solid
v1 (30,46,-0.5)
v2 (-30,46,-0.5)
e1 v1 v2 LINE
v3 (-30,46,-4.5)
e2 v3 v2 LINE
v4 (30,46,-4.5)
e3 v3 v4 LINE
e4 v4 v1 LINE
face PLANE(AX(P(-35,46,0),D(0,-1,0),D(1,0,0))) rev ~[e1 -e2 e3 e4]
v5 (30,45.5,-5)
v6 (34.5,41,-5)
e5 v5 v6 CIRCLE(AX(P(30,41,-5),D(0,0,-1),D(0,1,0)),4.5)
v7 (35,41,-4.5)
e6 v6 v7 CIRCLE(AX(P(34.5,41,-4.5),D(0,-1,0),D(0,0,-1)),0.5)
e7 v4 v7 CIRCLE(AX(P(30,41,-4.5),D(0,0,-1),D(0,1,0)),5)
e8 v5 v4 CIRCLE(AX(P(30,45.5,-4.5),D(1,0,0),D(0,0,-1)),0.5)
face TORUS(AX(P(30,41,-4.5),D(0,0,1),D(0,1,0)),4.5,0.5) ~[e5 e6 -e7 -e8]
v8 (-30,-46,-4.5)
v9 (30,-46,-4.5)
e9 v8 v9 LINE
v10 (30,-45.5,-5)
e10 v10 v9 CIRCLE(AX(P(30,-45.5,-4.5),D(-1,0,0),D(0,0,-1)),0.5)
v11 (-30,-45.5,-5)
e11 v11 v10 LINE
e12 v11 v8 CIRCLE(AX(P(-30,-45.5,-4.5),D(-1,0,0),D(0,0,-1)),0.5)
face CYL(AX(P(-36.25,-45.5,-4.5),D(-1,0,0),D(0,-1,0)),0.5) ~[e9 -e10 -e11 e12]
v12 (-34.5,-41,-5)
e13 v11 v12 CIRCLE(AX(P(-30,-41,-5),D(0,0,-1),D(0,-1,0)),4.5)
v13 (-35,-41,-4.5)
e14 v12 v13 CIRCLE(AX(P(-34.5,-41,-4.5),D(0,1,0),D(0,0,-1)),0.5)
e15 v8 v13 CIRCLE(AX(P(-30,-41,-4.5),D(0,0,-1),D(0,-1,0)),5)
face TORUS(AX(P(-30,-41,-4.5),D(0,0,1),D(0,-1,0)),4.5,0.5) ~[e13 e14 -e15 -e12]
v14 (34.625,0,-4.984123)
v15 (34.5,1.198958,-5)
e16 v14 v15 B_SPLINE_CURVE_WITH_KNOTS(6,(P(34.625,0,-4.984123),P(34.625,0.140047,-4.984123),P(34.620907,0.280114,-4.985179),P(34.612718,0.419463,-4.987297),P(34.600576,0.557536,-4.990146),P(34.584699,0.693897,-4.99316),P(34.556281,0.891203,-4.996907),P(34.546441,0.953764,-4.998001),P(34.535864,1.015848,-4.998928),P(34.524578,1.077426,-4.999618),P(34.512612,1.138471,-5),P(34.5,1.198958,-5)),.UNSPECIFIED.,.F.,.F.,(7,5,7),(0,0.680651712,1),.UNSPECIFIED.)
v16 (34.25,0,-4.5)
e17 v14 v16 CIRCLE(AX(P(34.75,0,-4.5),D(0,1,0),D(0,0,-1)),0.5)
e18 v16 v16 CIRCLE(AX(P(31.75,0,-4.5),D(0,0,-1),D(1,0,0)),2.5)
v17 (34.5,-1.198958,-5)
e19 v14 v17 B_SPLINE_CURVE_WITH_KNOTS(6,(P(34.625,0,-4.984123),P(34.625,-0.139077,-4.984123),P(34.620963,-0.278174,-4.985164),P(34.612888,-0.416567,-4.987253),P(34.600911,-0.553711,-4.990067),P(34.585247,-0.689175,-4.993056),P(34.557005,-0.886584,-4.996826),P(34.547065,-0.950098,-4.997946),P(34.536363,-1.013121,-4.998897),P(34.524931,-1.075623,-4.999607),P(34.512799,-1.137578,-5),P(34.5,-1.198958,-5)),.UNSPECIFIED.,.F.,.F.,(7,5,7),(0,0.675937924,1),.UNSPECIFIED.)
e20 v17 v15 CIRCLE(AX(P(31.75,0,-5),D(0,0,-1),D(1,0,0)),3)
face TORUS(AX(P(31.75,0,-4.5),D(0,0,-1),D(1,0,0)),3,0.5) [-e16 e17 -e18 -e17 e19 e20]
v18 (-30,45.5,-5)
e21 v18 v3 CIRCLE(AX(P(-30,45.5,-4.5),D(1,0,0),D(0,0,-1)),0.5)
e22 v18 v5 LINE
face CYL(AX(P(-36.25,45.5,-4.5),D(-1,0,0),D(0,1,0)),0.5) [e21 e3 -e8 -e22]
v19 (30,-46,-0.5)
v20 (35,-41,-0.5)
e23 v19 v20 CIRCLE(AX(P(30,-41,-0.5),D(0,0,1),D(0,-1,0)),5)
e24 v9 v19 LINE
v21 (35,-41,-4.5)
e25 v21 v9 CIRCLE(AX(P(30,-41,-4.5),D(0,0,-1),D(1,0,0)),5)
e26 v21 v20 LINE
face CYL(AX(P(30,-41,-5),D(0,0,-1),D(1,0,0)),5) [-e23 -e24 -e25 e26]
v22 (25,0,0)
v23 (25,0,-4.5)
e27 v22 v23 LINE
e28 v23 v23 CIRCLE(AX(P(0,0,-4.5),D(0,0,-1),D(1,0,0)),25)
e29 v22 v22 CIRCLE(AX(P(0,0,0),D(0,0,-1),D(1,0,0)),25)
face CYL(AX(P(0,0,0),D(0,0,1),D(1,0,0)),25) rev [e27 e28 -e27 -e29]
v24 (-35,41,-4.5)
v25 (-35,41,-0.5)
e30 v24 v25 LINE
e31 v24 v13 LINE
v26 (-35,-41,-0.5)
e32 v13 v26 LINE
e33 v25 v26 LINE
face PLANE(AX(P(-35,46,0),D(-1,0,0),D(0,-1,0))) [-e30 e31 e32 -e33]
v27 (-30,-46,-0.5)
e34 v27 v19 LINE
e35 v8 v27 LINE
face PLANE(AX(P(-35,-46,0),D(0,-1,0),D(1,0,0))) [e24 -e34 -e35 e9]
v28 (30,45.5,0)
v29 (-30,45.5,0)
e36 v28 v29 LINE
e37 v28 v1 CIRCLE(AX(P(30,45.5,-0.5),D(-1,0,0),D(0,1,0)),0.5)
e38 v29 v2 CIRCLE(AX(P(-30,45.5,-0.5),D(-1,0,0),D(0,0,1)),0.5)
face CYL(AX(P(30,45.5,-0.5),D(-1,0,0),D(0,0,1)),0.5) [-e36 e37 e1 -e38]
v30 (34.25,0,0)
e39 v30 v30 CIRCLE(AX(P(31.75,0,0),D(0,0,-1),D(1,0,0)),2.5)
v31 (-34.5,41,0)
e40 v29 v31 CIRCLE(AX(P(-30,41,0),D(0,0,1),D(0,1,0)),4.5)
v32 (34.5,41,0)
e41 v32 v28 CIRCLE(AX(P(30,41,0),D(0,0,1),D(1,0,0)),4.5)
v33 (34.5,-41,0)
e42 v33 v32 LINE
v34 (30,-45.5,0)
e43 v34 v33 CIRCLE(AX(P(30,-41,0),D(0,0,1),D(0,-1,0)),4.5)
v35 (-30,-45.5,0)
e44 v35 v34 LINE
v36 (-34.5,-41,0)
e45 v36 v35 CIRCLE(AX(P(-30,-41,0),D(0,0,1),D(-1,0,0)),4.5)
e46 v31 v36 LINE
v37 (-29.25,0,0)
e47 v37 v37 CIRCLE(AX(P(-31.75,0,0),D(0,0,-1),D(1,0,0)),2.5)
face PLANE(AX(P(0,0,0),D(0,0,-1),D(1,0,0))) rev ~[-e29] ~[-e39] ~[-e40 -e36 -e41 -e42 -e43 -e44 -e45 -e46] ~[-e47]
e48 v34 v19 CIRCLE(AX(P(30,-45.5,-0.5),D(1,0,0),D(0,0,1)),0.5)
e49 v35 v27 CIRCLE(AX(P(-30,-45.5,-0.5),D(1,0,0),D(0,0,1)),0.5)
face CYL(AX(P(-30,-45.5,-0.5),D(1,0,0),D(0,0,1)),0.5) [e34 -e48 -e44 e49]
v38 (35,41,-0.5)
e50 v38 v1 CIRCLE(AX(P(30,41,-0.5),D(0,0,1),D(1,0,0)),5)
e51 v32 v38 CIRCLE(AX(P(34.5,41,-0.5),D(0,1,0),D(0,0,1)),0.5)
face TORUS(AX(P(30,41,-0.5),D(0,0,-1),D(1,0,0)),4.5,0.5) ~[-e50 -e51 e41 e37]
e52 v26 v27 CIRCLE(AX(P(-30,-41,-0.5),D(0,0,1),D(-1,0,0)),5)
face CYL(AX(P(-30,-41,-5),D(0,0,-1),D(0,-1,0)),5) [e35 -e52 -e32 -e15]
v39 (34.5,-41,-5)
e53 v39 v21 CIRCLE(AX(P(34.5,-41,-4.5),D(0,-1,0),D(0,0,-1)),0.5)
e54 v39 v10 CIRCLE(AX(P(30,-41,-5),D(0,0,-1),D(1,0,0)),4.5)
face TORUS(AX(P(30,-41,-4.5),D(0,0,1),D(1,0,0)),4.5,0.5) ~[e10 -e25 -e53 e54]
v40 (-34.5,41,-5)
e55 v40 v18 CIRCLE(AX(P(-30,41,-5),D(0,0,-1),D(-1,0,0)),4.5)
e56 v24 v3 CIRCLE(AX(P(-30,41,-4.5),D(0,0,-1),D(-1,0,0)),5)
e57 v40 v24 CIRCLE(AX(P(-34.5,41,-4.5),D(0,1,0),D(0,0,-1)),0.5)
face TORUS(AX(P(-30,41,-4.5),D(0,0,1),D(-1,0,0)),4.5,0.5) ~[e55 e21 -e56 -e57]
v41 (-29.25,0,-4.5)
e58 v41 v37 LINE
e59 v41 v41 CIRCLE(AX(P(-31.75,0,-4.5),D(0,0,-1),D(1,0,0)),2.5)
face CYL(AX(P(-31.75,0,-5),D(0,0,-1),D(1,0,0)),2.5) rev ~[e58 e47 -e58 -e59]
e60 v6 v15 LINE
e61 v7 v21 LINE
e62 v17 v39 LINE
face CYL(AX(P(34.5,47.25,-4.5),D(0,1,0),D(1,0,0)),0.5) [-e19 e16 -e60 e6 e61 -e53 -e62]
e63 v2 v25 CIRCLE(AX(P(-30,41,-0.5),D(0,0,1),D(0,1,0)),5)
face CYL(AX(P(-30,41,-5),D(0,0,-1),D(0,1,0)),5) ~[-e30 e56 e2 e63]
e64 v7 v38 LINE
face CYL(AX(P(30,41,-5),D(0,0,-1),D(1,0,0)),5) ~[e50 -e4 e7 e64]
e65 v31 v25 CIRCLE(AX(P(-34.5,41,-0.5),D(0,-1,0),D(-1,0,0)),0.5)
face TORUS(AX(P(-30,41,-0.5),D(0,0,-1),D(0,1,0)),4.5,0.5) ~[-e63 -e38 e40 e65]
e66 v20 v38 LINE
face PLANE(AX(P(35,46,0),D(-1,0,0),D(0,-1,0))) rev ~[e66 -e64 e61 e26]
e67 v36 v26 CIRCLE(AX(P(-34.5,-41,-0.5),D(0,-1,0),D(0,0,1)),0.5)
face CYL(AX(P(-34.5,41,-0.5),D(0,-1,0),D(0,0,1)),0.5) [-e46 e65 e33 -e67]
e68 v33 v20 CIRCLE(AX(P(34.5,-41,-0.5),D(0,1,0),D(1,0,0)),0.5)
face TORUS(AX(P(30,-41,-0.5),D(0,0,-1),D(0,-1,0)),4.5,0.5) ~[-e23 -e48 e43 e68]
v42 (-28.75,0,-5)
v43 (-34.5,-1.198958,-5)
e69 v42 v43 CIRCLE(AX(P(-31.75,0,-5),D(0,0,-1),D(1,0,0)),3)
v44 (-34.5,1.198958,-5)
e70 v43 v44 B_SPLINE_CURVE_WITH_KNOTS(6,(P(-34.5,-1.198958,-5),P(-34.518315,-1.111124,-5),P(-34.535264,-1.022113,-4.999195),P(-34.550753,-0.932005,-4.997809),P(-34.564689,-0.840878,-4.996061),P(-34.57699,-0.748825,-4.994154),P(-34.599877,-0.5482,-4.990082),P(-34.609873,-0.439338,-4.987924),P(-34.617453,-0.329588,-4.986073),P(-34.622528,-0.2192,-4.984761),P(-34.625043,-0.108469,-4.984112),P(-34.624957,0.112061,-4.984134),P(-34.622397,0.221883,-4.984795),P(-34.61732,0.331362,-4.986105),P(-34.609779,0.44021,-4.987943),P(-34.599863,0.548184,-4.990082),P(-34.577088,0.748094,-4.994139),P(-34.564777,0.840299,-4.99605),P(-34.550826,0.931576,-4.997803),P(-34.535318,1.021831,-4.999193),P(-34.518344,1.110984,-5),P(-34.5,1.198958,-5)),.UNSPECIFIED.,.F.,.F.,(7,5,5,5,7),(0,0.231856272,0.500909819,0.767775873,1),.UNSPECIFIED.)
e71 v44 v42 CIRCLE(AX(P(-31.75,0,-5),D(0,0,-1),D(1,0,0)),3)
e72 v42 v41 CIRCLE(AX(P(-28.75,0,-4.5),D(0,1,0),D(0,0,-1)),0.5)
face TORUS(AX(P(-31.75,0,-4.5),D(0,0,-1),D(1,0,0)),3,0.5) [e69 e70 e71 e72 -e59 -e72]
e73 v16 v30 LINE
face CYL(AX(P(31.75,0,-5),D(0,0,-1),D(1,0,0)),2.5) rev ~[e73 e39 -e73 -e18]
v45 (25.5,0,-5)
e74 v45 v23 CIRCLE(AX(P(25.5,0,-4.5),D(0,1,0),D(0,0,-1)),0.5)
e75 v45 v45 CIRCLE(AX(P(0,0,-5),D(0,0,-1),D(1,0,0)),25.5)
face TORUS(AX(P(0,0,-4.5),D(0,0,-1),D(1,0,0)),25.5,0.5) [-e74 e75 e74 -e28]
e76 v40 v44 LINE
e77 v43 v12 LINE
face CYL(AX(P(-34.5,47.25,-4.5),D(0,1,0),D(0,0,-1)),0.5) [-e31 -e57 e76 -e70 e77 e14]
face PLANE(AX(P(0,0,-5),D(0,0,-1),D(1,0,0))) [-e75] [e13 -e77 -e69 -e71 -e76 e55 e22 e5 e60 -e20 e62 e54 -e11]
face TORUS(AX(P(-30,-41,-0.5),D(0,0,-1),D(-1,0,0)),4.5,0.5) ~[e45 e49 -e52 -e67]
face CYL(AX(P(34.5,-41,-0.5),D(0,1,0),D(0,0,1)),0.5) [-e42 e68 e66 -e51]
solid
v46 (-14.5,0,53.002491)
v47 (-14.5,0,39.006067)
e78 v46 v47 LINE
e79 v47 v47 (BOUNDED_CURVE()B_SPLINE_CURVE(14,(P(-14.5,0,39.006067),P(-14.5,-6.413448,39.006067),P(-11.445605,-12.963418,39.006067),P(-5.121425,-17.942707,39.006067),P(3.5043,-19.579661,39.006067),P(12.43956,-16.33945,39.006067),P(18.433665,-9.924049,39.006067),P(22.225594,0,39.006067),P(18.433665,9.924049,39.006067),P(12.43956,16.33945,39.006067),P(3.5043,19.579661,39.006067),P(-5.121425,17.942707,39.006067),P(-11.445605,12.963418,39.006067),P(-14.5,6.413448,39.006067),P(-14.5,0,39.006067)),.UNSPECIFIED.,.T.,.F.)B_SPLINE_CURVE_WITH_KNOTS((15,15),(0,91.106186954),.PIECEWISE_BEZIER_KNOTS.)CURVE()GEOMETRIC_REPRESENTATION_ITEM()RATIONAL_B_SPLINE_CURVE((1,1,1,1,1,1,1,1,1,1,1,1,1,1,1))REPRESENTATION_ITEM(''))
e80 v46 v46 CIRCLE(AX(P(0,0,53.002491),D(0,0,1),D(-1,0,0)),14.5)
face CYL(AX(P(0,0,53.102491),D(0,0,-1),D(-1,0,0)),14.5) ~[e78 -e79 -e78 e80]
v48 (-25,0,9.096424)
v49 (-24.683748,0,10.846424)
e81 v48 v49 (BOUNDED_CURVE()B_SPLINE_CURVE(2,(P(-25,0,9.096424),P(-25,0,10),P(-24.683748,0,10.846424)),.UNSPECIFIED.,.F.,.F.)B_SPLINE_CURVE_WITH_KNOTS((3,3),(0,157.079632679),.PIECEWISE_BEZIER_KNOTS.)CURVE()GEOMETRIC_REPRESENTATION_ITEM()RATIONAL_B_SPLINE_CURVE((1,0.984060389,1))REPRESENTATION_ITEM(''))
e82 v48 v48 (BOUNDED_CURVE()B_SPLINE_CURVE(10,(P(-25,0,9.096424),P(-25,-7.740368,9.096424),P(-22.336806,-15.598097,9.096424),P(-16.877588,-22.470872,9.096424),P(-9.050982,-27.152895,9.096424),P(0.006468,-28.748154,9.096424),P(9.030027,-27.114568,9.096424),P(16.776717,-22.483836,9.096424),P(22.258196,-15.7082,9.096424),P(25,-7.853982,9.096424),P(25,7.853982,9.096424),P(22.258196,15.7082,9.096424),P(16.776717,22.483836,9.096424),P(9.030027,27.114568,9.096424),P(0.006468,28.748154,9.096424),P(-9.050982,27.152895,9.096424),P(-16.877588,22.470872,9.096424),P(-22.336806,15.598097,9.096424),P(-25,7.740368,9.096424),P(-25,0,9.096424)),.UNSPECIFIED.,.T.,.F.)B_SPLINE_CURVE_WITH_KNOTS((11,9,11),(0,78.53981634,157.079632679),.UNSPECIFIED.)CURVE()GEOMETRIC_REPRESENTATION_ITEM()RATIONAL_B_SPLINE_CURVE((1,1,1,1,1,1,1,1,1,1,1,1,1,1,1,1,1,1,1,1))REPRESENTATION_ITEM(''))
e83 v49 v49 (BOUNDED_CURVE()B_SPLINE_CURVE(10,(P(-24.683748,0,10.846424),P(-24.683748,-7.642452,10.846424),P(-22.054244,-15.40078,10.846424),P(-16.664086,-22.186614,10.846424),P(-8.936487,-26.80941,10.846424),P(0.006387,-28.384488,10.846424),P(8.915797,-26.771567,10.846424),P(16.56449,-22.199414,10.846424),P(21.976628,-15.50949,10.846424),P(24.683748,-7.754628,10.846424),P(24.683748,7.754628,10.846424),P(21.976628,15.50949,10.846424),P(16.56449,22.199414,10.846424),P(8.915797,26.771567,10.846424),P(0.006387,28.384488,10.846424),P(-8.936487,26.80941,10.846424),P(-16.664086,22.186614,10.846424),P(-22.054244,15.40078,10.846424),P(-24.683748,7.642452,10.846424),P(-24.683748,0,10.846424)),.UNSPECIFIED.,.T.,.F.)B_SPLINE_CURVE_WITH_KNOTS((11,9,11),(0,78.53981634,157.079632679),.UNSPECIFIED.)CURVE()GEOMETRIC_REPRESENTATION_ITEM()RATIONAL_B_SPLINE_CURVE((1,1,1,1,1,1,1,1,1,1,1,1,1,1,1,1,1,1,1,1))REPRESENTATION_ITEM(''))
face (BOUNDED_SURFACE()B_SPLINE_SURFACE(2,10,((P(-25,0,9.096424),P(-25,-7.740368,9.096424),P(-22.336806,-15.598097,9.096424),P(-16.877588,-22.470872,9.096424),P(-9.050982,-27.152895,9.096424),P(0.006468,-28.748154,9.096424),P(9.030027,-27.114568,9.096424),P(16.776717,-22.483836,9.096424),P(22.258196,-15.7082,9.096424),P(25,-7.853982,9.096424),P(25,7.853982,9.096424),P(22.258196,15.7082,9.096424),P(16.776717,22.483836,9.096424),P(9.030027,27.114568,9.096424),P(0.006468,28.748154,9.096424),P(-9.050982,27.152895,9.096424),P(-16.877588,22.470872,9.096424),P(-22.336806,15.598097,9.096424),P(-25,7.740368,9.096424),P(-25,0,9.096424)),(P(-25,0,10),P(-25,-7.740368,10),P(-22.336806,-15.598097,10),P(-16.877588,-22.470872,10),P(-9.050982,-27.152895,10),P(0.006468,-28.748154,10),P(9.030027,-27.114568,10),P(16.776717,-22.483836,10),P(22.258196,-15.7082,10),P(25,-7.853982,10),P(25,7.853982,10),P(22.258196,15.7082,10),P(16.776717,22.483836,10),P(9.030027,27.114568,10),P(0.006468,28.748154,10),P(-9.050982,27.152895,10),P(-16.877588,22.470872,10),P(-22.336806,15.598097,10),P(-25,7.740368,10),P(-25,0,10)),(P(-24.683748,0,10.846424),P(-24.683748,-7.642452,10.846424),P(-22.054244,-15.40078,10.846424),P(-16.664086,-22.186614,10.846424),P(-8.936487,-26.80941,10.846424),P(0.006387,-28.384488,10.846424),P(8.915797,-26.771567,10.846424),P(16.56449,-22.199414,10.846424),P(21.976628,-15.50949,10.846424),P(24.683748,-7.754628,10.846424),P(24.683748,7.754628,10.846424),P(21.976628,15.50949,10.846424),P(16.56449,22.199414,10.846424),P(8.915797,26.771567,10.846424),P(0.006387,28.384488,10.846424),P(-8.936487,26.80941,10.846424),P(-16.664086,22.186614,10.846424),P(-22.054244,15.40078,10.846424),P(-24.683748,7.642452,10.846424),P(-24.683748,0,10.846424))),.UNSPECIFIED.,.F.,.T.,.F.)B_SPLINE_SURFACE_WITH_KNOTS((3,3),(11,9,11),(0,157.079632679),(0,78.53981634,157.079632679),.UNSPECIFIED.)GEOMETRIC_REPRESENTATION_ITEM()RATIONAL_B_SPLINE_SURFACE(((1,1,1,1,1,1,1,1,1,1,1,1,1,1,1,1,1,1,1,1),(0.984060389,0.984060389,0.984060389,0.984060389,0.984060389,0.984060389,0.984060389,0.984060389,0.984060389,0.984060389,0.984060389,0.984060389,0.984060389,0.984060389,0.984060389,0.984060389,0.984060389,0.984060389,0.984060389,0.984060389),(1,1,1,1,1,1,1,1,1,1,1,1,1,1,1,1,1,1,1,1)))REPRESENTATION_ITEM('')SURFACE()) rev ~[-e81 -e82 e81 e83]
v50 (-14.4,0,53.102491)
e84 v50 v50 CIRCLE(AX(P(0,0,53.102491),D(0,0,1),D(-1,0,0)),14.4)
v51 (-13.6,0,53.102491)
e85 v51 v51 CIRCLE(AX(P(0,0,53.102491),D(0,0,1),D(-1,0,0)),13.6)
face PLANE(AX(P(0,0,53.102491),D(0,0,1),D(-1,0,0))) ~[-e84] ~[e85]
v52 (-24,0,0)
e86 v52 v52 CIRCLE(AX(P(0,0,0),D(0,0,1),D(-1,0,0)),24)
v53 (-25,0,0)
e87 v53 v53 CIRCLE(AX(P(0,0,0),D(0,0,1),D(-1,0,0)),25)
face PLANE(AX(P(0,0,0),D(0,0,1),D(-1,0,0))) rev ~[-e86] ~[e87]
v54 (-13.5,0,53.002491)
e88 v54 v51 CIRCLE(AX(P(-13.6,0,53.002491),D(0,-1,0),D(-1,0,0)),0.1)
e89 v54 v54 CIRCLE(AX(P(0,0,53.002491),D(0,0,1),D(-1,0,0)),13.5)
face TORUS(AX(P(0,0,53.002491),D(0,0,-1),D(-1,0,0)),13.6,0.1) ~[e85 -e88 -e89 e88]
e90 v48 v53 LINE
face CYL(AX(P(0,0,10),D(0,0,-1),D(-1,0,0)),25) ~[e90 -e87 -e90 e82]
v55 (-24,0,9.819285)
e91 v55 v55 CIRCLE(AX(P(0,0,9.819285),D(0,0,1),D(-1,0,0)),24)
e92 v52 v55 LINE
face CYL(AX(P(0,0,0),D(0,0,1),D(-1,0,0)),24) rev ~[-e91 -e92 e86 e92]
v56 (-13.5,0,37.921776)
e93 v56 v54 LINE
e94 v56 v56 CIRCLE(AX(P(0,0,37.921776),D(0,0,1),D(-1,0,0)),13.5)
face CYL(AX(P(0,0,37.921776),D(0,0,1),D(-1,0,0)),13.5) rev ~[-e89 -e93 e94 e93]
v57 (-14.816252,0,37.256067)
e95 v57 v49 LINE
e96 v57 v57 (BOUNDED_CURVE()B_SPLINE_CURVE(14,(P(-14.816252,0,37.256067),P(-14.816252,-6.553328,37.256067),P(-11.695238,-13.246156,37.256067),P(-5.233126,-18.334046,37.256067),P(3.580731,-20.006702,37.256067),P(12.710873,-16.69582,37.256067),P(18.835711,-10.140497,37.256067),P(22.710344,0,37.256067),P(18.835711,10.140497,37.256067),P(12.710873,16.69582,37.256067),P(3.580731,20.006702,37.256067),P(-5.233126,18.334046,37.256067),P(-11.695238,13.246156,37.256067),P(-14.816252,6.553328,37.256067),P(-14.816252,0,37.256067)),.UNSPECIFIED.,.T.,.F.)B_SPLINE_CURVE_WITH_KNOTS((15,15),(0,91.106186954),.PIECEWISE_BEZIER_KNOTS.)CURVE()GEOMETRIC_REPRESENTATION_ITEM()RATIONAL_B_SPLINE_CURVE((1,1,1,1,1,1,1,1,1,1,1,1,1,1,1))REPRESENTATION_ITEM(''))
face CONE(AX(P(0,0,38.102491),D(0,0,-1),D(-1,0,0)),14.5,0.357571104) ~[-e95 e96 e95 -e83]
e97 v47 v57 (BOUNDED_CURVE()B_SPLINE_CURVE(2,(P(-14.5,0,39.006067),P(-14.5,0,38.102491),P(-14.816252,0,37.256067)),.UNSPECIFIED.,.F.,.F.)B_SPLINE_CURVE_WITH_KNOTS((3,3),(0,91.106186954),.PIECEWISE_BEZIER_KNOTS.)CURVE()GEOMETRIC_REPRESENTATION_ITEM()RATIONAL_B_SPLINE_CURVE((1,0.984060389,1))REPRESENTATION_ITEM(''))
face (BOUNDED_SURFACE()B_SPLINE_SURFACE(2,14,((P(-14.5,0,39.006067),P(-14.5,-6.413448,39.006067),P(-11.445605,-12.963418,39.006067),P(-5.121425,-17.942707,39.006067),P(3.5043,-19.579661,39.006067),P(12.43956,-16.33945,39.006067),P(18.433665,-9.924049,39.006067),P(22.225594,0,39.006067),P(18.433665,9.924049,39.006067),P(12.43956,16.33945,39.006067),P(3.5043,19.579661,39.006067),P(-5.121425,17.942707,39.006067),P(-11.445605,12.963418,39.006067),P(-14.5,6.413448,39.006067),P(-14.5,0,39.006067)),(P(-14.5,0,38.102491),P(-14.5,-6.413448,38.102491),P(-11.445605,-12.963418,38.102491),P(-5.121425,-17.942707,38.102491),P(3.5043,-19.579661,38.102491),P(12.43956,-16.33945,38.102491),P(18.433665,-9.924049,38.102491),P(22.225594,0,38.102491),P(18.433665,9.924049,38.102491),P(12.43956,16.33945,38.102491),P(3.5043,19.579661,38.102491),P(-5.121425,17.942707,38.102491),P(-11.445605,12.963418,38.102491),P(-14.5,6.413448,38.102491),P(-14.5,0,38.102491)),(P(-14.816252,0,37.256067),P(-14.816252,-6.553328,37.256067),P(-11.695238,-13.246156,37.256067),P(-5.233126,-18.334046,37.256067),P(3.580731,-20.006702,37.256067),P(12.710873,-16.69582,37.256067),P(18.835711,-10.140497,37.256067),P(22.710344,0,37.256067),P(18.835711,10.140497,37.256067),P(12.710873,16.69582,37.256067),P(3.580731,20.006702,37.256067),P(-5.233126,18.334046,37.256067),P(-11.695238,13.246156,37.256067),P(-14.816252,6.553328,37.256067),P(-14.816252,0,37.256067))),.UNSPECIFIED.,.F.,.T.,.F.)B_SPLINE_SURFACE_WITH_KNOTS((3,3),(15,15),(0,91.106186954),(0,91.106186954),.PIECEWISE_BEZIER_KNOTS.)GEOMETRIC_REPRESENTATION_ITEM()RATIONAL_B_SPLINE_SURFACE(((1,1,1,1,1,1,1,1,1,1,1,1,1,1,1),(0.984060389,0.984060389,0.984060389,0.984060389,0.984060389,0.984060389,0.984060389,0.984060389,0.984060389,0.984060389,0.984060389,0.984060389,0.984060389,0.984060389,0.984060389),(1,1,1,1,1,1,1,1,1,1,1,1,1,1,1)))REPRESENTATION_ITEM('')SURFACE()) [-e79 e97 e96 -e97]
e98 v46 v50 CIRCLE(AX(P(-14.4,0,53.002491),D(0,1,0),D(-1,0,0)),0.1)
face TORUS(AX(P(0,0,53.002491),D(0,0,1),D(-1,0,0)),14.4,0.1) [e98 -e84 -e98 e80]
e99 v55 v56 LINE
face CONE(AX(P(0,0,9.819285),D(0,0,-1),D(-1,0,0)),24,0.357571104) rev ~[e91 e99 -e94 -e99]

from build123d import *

# Parameters (mm, degrees)
F2_W         = 70
F2_H         = 92
F2_R         = 25
F3_DEPTH     = 5
F4_R         = 2.5
F5_DEPTH     = 25
F6_T1_DEPTH  = 94.5
F6_T3_DEPTH  = 72.5
F7_T1_DEPTH  = 17.5
F7_T4_ANGLE  = 90
F7_T6_ANGLE  = 90
F7_T8_ANGLE  = 90
F7_T10_ANGLE = 90
F8_R         = 0.5
F9_R         = 5
F10_R        = 0.1


# Not quite as in the source:
# - a fillet or chamfer that OpenCascade refuses, or shapes differently, is made with other operations: its cross-section is extruded or revolved along the edge and cut away or added


with BuildPart() as f1:
    # F0 (on Front) → F1 (revolve)
    with BuildSketch(Plane.XZ):
        Polygon((-25, 10), (-25, 0), (-24, 0), (-24, 9.8192848565), (-13.5, 37.9217758492), (-13.5, 53.1024909928), (-14.5, 53.1024909928), (-14.5, 38.1024909928), align=None)
    revolve(axis=Axis((0, 0, 23.4480407089), (0, 0, 1)))

    # F9
    f9_edges = [f1.edges().sort_by_distance(p)[0] for p in [
        (25, 0, 10),
        (14.5, 0, 38.102491),
    ]]
    fillet(f9_edges, radius=F9_R)

    # F10
    f10_edges = [f1.edges().sort_by_distance(p)[0] for p in [
        (13.5, 0, 53.102491),
        (14.5, 0, 53.102491),
    ]]
    fillet(f10_edges, radius=F10_R)


with BuildPart() as f3:
    # F2 (on face) → F3 (new body)
    with BuildSketch(Plane(origin=(0, 0, 0), x_dir=(1, 0, 0), z_dir=(0, 0, -1))):
        Rectangle(F2_W, F2_H)
        Circle(F2_R, mode=Mode.SUBTRACT)
    extrude(amount=F3_DEPTH)

    # F4 (on face) → F5 (cut)
    with BuildSketch(Plane(origin=(0, 0, -5), x_dir=(1, 0, 0), z_dir=(0, 0, -1))):
        with Locations((-31.75, 0)):
            Circle(F4_R)
        with Locations((31.75, 0)):
            Circle(F4_R)
    extrude(amount=-F5_DEPTH, mode=Mode.SUBTRACT)

    # F6: fillet of radius 0.5 on 7 edges, made by hand

    # F6_s2 → F6_t1 (cut)
    with BuildSketch(Plane.XZ.offset(-47.25)):
        with BuildLine():
            ThreePointArc((35, -4.5), (34.8535533906, -4.8535533906), (34.5, -5))
            Line((34.5, -5), (35, -5))
            Line((35, -5), (35, -4.5))
        make_face()
        with BuildLine():
            ThreePointArc((-34.5, -5), (-34.8535533906, -4.8535533906), (-35, -4.5))
            Line((-35, -4.5), (-35, -5))
            Line((-35, -5), (-34.5, -5))
        make_face()
    extrude(amount=F6_T1_DEPTH, mode=Mode.SUBTRACT)

    # F6_s4 → F6_t3 (cut)
    with BuildSketch(Plane.YZ.offset(-36.25)):
        with BuildLine():
            ThreePointArc((46, -4.5), (45.8535533906, -4.8535533906), (45.5, -5))
            Line((45.5, -5), (46, -5))
            Line((46, -5), (46, -4.5))
        make_face()
        with BuildLine():
            ThreePointArc((-46, -4.5), (-45.8535533906, -4.8535533906), (-45.5, -5))
            Line((-45.5, -5), (-46, -5))
            Line((-46, -5), (-46, -4.5))
        make_face()
    extrude(amount=F6_T3_DEPTH, mode=Mode.SUBTRACT)

    # F6_s5 → F6_t6 (revolve, cut)
    with BuildSketch(Plane.XZ):
        with BuildLine():
            ThreePointArc((-28.75, -5), (-29.1035533906, -4.8535533906), (-29.25, -4.5))
            Line((-29.25, -4.5), (-29.25, -5))
            Line((-29.25, -5), (-28.75, -5))
        make_face()
    revolve(axis=Axis((-31.75, 0, -5), (0, 0, -1)), mode=Mode.SUBTRACT)

    # F6_s7 → F6_t8 (revolve, cut)
    with BuildSketch(Plane.XZ):
        with BuildLine():
            ThreePointArc((25.5, -5), (25.1464466094, -4.8535533906), (25, -4.5))
            Line((25, -4.5), (25, -5))
            Line((25, -5), (25.5, -5))
        make_face()
    revolve(axis=Axis((0, 0, -5), (0, 0, -1)), mode=Mode.SUBTRACT)

    # F6_s9 → F6_t10 (revolve, cut)
    with BuildSketch(Plane.XZ):
        with BuildLine():
            ThreePointArc((34.75, -5), (34.3964466094, -4.8535533906), (34.25, -4.5))
            Line((34.25, -4.5), (34.25, -5))
            Line((34.25, -5), (34.75, -5))
        make_face()
    revolve(axis=Axis((31.75, 0, -5), (0, 0, -1)), mode=Mode.SUBTRACT)

    # F7: fillet of radius 5 on 4 edges, made by hand

    # F7_s2 → F7_t1 (cut)
    with BuildSketch(Plane.XY.offset(-5)):
        with BuildLine():
            ThreePointArc((35, -41), (33.5355339059, -44.5355339059), (30, -46))
            Line((30, -46), (35, -46))
            Line((35, -46), (35, -41))
        make_face()
        with BuildLine():
            ThreePointArc((35, 41), (33.5355339059, 44.5355339059), (30, 46))
            Line((30, 46), (35, 46))
            Line((35, 46), (35, 41))
        make_face()
        with BuildLine():
            ThreePointArc((-30, -46), (-33.5355339059, -44.5355339059), (-35, -41))
            Line((-35, -41), (-35, -46))
            Line((-35, -46), (-30, -46))
        make_face()
        with BuildLine():
            ThreePointArc((-30, 46), (-33.5355339059, 44.5355339059), (-35, 41))
            Line((-35, 41), (-35, 46))
            Line((-35, 46), (-30, 46))
        make_face()
    extrude(amount=F7_T1_DEPTH, mode=Mode.SUBTRACT)

    # F7_s3 → F7_t4 (revolve, cut)
    with BuildSketch(Plane.XZ.offset(-41)):
        with BuildLine():
            ThreePointArc((-34.5, -5), (-34.8535533906, -4.8535533906), (-35, -4.5))
            Line((-35, -4.5), (-35, -5))
            Line((-35, -5), (-34.5, -5))
        make_face()
    revolve(axis=Axis((-30, 41, -5), (0, 0, -1)), revolution_arc=F7_T4_ANGLE, mode=Mode.SUBTRACT)

    # F7_s5 → F7_t6 (revolve, cut)
    with BuildSketch(Plane.YZ.offset(-30)):
        with BuildLine():
            ThreePointArc((-45.5, -5), (-45.8535533906, -4.8535533906), (-46, -4.5))
            Line((-46, -4.5), (-46, -5))
            Line((-46, -5), (-45.5, -5))
        make_face()
    revolve(axis=Axis((-30, -41, -5), (0, 0, -1)), revolution_arc=F7_T6_ANGLE, mode=Mode.SUBTRACT)

    # F7_s7 → F7_t8 (revolve, cut)
    with BuildSketch(Plane.YZ.offset(30)):
        with BuildLine():
            ThreePointArc((45.5, -5), (45.8535533906, -4.8535533906), (46, -4.5))
            Line((46, -4.5), (46, -5))
            Line((46, -5), (45.5, -5))
        make_face()
    revolve(axis=Axis((30, 41, -5), (0, 0, -1)), revolution_arc=F7_T8_ANGLE, mode=Mode.SUBTRACT)

    # F7_s9 → F7_t10 (revolve, cut)
    with BuildSketch(Plane.XZ.offset(41)):
        with BuildLine():
            ThreePointArc((34.5, -5), (34.8535533906, -4.8535533906), (35, -4.5))
            Line((35, -4.5), (35, -5))
            Line((35, -5), (34.5, -5))
        make_face()
    revolve(axis=Axis((30, -41, -5), (0, 0, -1)), revolution_arc=F7_T10_ANGLE, mode=Mode.SUBTRACT)

    # F8
    f8_edges = [f3.edges().sort_by_distance(p)[0] for p in [
        (0, -46, 0),
        (35, 0, 0),
        (33.535534, 44.535534, 0),
        (0, 46, 0),
        (-33.535534, 44.535534, 0),
        (-35, 0, 0),
        (-33.535534, -44.535534, 0),
        (33.535534, -44.535534, 0),
    ]]
    fillet(f8_edges, radius=F8_R)


solid = Compound([f1.part, f3.part])
